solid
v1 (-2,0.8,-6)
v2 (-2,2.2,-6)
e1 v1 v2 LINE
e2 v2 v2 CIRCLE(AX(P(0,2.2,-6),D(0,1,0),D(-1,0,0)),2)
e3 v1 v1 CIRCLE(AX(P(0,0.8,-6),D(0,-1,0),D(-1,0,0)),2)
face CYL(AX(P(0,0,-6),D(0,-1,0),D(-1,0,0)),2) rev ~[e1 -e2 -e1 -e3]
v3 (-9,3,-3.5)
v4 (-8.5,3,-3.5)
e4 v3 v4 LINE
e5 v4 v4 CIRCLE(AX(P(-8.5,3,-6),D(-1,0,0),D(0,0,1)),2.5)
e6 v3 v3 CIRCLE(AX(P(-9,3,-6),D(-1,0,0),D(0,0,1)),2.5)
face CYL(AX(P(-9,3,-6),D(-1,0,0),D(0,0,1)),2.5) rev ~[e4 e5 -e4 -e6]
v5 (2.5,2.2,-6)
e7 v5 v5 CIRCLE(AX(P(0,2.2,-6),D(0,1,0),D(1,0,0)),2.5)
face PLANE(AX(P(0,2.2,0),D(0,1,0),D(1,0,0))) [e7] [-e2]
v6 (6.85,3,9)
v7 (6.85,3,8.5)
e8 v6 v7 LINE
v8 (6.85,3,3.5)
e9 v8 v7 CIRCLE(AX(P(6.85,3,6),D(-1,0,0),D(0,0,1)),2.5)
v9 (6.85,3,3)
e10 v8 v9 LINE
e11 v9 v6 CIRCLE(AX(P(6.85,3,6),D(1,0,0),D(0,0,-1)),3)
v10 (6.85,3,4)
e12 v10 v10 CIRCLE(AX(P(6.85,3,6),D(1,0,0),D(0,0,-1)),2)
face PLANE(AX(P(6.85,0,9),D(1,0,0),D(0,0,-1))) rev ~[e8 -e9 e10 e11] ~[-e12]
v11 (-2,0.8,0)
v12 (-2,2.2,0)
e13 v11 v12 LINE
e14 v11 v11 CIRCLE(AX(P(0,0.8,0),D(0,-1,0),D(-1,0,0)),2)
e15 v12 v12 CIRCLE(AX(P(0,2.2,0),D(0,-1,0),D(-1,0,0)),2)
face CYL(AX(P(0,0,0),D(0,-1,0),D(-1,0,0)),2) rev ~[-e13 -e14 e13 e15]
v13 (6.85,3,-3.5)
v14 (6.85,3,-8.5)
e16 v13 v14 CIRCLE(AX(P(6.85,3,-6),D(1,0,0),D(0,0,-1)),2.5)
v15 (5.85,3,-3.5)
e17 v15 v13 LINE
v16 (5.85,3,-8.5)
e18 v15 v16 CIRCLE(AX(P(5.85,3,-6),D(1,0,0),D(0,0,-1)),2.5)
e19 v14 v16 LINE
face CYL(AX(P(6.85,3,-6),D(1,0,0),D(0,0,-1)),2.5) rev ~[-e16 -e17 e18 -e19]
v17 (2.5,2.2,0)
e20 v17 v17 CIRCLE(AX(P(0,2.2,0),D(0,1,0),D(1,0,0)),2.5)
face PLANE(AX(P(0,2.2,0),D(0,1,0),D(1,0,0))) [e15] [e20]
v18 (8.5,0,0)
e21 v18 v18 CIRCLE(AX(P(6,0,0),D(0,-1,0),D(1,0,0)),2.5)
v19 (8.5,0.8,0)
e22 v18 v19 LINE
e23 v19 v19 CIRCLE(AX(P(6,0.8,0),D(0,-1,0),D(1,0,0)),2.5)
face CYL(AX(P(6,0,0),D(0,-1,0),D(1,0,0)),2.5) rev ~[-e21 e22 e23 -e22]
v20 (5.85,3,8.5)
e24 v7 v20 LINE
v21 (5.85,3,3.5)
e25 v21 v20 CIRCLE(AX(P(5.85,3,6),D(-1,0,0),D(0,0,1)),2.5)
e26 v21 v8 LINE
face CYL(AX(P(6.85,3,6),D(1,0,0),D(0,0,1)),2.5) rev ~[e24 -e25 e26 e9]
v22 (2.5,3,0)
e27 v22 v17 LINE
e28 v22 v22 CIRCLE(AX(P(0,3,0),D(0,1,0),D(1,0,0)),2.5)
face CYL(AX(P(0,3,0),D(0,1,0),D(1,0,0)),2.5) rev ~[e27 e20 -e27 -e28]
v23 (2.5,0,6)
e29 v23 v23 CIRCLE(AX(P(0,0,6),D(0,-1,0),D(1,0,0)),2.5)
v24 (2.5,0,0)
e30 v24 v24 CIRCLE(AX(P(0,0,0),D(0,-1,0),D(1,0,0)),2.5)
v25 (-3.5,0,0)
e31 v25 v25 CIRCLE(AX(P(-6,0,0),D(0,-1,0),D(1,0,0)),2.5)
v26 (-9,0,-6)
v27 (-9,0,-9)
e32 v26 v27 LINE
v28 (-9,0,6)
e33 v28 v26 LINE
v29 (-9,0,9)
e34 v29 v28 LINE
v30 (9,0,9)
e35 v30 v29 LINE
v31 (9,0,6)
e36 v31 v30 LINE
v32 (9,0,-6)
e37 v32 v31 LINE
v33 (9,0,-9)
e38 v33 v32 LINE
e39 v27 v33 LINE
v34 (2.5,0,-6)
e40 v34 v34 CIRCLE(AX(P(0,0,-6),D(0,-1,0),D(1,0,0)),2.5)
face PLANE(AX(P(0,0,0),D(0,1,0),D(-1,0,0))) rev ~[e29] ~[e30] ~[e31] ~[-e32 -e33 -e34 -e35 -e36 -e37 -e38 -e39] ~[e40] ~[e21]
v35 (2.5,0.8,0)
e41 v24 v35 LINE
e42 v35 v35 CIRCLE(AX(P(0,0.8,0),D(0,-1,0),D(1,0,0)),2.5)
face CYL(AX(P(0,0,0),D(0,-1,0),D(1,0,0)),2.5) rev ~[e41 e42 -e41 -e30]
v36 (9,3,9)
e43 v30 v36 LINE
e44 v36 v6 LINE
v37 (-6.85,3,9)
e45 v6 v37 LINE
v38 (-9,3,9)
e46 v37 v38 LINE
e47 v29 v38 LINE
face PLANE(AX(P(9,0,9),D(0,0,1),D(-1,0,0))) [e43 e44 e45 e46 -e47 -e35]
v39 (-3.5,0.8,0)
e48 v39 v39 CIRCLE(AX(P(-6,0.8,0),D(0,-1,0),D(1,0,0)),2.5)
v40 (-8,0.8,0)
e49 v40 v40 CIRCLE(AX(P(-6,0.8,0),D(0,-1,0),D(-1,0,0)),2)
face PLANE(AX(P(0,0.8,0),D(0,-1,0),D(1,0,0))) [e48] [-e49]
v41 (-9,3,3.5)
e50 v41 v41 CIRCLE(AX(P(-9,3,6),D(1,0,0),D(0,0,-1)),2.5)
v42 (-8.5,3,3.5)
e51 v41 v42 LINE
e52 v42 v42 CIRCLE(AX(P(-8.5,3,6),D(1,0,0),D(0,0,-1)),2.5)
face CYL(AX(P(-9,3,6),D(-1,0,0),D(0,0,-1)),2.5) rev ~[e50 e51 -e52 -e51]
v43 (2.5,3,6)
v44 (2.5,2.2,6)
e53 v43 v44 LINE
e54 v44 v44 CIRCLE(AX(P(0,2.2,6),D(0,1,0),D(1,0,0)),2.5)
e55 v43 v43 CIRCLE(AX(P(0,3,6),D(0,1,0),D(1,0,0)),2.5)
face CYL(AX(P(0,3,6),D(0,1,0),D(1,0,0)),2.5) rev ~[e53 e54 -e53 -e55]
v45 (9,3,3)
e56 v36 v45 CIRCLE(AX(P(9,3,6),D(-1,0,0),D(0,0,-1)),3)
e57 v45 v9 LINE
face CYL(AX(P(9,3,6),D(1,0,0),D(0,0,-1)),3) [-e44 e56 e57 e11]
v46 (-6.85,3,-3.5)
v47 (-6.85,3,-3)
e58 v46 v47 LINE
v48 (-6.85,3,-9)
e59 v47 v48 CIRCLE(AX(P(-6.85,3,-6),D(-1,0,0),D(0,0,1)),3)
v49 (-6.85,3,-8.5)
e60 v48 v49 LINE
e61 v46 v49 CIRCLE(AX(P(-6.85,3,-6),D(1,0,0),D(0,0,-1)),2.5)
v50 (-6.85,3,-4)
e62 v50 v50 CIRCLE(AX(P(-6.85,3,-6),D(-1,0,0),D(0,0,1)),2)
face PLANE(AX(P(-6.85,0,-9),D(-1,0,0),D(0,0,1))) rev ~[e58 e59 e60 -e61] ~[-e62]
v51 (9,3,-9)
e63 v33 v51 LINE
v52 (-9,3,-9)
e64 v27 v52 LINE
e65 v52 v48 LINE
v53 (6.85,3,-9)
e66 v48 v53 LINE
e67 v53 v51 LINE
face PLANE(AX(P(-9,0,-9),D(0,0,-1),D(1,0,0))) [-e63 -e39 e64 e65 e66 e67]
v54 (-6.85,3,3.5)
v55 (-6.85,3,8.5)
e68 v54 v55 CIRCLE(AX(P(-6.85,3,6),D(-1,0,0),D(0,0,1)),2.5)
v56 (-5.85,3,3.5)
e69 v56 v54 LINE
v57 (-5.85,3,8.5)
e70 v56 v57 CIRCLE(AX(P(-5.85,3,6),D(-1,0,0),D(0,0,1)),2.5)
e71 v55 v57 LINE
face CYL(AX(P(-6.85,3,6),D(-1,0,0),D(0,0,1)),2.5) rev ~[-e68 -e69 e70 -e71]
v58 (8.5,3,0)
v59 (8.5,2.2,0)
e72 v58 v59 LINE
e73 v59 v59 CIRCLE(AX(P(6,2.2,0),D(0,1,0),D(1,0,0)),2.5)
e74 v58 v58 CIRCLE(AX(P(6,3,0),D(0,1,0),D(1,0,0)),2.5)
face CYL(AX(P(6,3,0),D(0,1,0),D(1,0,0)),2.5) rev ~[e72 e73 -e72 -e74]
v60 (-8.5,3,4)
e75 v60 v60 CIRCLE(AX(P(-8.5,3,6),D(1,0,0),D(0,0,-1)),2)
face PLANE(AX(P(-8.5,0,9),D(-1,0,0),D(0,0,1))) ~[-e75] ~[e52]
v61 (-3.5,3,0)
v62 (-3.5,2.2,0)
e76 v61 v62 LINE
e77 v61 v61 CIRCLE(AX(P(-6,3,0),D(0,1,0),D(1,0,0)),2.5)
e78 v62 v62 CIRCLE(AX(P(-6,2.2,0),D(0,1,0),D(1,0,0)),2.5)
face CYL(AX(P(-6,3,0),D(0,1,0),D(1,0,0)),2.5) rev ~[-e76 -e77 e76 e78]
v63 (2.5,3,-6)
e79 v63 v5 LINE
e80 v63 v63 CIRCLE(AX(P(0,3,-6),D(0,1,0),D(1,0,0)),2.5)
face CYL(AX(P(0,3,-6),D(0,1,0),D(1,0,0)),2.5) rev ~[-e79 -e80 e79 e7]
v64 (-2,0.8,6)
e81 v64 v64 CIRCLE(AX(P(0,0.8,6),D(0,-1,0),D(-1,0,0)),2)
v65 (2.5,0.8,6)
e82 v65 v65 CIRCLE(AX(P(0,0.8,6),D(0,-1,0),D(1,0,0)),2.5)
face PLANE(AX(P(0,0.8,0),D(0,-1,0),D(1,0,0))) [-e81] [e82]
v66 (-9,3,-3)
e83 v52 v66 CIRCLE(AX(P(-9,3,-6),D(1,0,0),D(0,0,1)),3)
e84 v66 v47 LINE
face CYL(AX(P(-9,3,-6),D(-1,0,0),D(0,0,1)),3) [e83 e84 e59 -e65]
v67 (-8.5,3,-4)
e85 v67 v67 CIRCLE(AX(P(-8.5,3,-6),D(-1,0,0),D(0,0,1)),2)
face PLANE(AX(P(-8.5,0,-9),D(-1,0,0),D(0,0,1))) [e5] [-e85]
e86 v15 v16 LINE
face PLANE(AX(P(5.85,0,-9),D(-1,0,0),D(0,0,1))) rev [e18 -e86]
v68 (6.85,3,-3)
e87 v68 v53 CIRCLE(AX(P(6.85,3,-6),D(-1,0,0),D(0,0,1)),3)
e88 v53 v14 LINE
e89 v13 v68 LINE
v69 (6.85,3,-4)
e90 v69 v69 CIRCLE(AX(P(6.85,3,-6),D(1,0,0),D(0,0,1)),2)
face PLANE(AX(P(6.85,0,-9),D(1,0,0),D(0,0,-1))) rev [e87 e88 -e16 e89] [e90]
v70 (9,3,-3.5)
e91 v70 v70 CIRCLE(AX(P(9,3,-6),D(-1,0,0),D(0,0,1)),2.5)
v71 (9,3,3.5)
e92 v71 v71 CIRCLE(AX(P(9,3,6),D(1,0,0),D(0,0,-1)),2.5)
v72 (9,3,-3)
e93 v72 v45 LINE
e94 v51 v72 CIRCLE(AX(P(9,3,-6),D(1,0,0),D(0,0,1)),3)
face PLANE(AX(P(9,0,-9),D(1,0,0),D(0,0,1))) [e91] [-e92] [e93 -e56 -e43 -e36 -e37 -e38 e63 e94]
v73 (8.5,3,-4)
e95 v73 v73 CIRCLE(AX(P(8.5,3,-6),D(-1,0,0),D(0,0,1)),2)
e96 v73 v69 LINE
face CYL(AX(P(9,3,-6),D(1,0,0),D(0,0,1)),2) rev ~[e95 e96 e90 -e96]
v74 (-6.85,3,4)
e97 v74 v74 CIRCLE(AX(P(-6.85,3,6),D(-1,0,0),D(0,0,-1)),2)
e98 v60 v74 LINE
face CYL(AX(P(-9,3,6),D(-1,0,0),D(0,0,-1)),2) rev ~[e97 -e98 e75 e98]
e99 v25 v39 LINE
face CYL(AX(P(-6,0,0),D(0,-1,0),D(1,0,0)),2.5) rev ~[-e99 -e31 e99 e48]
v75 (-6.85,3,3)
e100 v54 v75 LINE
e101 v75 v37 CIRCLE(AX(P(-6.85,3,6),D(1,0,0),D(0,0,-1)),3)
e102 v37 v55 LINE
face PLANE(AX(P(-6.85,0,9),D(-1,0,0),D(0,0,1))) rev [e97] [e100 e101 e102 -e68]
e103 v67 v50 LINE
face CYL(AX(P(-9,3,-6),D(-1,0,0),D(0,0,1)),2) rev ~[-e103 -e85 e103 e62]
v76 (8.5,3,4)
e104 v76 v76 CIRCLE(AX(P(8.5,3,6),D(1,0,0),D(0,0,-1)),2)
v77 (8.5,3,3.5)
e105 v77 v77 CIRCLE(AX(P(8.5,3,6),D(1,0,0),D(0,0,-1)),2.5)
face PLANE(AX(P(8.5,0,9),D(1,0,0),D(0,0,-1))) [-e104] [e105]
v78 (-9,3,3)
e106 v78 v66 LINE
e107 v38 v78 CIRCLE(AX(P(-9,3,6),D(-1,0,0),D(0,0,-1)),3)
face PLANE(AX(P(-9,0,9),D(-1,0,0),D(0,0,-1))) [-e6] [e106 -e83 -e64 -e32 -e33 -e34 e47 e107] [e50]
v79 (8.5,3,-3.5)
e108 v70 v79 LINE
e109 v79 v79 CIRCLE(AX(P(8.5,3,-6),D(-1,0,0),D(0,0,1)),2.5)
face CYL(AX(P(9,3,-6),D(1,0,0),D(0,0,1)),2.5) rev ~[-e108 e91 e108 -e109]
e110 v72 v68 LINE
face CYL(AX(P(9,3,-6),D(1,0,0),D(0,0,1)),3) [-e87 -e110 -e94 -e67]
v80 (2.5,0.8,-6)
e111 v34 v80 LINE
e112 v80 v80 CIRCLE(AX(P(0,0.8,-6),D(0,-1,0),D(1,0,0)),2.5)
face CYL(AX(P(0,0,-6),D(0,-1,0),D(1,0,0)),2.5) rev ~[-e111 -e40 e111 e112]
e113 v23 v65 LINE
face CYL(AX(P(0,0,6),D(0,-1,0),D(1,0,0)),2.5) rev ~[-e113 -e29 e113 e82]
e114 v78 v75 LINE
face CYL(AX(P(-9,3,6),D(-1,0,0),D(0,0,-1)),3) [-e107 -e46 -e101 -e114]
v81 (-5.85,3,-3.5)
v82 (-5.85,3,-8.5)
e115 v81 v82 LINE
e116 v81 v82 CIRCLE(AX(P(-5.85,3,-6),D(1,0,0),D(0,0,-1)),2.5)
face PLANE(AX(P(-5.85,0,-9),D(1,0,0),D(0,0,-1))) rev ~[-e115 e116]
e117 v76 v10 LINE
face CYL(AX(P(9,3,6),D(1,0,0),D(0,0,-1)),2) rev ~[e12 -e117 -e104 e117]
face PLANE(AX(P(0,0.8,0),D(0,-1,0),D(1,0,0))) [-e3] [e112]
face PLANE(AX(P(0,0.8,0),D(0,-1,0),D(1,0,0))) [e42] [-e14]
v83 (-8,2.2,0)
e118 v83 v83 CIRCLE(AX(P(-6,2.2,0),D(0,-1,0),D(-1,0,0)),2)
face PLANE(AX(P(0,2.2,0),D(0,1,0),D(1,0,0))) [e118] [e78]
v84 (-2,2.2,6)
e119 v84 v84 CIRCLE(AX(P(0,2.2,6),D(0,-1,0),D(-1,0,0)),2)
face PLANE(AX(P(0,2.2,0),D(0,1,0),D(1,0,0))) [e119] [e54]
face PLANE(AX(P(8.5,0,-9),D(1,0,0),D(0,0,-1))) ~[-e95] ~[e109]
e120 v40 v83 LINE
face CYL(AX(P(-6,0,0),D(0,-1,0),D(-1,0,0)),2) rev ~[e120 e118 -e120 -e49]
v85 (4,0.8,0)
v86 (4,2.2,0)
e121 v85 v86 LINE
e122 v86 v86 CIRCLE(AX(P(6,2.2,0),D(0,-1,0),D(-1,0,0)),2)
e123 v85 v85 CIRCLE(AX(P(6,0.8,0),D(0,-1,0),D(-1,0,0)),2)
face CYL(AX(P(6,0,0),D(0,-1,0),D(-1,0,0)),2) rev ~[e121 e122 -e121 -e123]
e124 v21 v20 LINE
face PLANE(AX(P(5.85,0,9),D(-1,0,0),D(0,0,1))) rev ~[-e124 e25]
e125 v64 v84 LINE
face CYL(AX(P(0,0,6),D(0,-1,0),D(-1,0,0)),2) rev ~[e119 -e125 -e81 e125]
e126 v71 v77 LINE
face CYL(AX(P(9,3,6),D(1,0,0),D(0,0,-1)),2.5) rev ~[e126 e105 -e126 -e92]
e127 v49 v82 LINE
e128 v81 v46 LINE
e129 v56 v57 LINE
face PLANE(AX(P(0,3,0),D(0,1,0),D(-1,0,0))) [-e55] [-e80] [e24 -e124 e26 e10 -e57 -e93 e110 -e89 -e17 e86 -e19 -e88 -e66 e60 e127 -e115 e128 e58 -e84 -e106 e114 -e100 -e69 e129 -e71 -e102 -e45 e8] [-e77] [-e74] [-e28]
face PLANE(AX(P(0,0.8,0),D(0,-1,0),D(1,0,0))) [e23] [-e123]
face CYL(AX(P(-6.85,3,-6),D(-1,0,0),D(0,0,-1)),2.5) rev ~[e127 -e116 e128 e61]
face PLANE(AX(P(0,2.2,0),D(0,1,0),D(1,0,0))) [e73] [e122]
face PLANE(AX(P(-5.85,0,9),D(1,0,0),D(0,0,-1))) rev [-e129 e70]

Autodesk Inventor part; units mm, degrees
ref_plane "YZ Plane" through (0, 0, 0) normal (1, 0, 0) x (0, 1, 0)
sketch "Sketch1" plane through (0, 0, 0) normal (0, 1, 0) x (-1, 0, 0)
  line L0 (-9, 9) -> (9, 9)
  line L1 (9, 9) -> (9, -9)
  line L2 (9, -9) -> (-9, -9)
  line L3 (-9, -9) -> (-9, 9)
  line L4 (-9, 9) -> (9, -9) construction
  line L5 (9, 9) -> (-9, -9) construction
  circle A0 centre (0, 0) radius 2
  line L6 (0, 0) -> (0, -6) construction
  circle A1 centre (0, -6) radius 2
  circle A2 centre (6, 0) radius 2
  circle A3 centre (0, 6) radius 2
  circle A4 centre (-6, 0) radius 2
  dimension "d0" = 18
  dimension "d1" = 18
  dimension "d2" = 4
  dimension "d3" = 6
  dimension "d8" = 4
  dimension "d11" = 360
extrude "Extrusion1" add sketch "Sketch1" along normal blind 3
sketch "Sketch2" plane through (0, 3, 0) normal (0, 1, 0) x (1, 0, 0)
  circle A0 centre (0, 6) radius 2 projected
  circle A1 centre (0, 0) radius 2.5
  circle A2 centre (0, 6) radius 2.5
  circle A3 centre (-6, 0) radius 2.5
  circle A4 centre (0, -6) radius 2.5
  circle A5 centre (6, 0) radius 2.5
  dimension "d15" = 5
  dimension "d16" = 5
  dimension "d19" = 360
extrude "Extrusion2" cut sketch "Sketch2" against normal blind 0.8
sketch "Sketch3" plane through (0, 0, 0) normal (0, -1, 0) x (1, 0, 0)
  circle A0 centre (0, 0) radius 2.5
  circle A1 centre (0, -6) radius 2.5 projected
  circle A2 centre (0, -6) radius 2.5
  circle A3 centre (6, 0) radius 2.5
  circle A4 centre (0, 6) radius 2.5
  circle A5 centre (-6, 0) radius 2.5
  dimension "d25" = 360
extrude "Extrusion3" cut sketch "Sketch3" against normal blind 0.8
sketch "Sketch4" plane through (9, 0, 9) normal (1, 0, 0) x (0, 0, -1)
  line L0 (0, 3) -> (3, 3) construction
  line L1 (0, 3) -> (18, 3) projected
  circle A0 centre (3, 3) radius 3
  point P0 (9, 0)
  dimension "d29" = 3
extrude "Extrusion4" add sketch "Sketch4" against normal blind 2.15
sketch "Sketch5" plane through (9, 0, 9) normal (1, 0, 0) x (0, 0, -1)
  line L0 (0, 3) -> (6, 3) projected
  arc A0 (6, 3) -> (0, 3) centre (3, 3) ccw projected
  circle A1 centre (3, 3) radius 2
  point P0 (9, 0)
  dimension "d32" = 4
extrude "Extrusion5" cut sketch "Sketch5" against normal blind 3 contours A1 L0 | L0 A1
sketch "Sketch6" plane through (9, 0, 9) normal (1, 0, 0) x (0, 0, -1)
  circle A0 centre (3, 3) radius 2 projected
  circle A1 centre (3, 3) radius 2.5
  point P0 (9, 0)
  dimension "d35" = 5
extrude "Extrusion6" cut sketch "Sketch6" against normal blind 0.5
sketch "Sketch7" plane through (6.85, 0, 9) normal (-1, 0, 0) x (0, 0, 1)
  arc A0 (-1, 3) -> (-5, 3) centre (-3, 3) ccw projected
  circle A1 centre (-3, 3) radius 2.5
  point P0 (-9, 0)
  dimension "d38" = 5
extrude "Extrusion7" cut sketch "Sketch7" along normal blind 1
ref_plane "Work Plane1" through (-9, 0, 0) normal (0, 0, 1) x (1, 0, 0)
ref_plane "Work Plane2" through (0, 0, -9) normal (-1, 0, 0) x (0, 0, 1)
mirror "Mirror1" about plane through (-9, 0, 0) normal (0, 0, 1) of "Extrusion4", "Extrusion5", "Extrusion6", "Extrusion7"
mirror "Mirror2" about plane through (0, 0, -9) normal (-1, 0, 0) of "Extrusion4", "Extrusion5", "Extrusion6", "Extrusion7", "Mirror1"
properties part number "XL320_HubToXL320_Base"
